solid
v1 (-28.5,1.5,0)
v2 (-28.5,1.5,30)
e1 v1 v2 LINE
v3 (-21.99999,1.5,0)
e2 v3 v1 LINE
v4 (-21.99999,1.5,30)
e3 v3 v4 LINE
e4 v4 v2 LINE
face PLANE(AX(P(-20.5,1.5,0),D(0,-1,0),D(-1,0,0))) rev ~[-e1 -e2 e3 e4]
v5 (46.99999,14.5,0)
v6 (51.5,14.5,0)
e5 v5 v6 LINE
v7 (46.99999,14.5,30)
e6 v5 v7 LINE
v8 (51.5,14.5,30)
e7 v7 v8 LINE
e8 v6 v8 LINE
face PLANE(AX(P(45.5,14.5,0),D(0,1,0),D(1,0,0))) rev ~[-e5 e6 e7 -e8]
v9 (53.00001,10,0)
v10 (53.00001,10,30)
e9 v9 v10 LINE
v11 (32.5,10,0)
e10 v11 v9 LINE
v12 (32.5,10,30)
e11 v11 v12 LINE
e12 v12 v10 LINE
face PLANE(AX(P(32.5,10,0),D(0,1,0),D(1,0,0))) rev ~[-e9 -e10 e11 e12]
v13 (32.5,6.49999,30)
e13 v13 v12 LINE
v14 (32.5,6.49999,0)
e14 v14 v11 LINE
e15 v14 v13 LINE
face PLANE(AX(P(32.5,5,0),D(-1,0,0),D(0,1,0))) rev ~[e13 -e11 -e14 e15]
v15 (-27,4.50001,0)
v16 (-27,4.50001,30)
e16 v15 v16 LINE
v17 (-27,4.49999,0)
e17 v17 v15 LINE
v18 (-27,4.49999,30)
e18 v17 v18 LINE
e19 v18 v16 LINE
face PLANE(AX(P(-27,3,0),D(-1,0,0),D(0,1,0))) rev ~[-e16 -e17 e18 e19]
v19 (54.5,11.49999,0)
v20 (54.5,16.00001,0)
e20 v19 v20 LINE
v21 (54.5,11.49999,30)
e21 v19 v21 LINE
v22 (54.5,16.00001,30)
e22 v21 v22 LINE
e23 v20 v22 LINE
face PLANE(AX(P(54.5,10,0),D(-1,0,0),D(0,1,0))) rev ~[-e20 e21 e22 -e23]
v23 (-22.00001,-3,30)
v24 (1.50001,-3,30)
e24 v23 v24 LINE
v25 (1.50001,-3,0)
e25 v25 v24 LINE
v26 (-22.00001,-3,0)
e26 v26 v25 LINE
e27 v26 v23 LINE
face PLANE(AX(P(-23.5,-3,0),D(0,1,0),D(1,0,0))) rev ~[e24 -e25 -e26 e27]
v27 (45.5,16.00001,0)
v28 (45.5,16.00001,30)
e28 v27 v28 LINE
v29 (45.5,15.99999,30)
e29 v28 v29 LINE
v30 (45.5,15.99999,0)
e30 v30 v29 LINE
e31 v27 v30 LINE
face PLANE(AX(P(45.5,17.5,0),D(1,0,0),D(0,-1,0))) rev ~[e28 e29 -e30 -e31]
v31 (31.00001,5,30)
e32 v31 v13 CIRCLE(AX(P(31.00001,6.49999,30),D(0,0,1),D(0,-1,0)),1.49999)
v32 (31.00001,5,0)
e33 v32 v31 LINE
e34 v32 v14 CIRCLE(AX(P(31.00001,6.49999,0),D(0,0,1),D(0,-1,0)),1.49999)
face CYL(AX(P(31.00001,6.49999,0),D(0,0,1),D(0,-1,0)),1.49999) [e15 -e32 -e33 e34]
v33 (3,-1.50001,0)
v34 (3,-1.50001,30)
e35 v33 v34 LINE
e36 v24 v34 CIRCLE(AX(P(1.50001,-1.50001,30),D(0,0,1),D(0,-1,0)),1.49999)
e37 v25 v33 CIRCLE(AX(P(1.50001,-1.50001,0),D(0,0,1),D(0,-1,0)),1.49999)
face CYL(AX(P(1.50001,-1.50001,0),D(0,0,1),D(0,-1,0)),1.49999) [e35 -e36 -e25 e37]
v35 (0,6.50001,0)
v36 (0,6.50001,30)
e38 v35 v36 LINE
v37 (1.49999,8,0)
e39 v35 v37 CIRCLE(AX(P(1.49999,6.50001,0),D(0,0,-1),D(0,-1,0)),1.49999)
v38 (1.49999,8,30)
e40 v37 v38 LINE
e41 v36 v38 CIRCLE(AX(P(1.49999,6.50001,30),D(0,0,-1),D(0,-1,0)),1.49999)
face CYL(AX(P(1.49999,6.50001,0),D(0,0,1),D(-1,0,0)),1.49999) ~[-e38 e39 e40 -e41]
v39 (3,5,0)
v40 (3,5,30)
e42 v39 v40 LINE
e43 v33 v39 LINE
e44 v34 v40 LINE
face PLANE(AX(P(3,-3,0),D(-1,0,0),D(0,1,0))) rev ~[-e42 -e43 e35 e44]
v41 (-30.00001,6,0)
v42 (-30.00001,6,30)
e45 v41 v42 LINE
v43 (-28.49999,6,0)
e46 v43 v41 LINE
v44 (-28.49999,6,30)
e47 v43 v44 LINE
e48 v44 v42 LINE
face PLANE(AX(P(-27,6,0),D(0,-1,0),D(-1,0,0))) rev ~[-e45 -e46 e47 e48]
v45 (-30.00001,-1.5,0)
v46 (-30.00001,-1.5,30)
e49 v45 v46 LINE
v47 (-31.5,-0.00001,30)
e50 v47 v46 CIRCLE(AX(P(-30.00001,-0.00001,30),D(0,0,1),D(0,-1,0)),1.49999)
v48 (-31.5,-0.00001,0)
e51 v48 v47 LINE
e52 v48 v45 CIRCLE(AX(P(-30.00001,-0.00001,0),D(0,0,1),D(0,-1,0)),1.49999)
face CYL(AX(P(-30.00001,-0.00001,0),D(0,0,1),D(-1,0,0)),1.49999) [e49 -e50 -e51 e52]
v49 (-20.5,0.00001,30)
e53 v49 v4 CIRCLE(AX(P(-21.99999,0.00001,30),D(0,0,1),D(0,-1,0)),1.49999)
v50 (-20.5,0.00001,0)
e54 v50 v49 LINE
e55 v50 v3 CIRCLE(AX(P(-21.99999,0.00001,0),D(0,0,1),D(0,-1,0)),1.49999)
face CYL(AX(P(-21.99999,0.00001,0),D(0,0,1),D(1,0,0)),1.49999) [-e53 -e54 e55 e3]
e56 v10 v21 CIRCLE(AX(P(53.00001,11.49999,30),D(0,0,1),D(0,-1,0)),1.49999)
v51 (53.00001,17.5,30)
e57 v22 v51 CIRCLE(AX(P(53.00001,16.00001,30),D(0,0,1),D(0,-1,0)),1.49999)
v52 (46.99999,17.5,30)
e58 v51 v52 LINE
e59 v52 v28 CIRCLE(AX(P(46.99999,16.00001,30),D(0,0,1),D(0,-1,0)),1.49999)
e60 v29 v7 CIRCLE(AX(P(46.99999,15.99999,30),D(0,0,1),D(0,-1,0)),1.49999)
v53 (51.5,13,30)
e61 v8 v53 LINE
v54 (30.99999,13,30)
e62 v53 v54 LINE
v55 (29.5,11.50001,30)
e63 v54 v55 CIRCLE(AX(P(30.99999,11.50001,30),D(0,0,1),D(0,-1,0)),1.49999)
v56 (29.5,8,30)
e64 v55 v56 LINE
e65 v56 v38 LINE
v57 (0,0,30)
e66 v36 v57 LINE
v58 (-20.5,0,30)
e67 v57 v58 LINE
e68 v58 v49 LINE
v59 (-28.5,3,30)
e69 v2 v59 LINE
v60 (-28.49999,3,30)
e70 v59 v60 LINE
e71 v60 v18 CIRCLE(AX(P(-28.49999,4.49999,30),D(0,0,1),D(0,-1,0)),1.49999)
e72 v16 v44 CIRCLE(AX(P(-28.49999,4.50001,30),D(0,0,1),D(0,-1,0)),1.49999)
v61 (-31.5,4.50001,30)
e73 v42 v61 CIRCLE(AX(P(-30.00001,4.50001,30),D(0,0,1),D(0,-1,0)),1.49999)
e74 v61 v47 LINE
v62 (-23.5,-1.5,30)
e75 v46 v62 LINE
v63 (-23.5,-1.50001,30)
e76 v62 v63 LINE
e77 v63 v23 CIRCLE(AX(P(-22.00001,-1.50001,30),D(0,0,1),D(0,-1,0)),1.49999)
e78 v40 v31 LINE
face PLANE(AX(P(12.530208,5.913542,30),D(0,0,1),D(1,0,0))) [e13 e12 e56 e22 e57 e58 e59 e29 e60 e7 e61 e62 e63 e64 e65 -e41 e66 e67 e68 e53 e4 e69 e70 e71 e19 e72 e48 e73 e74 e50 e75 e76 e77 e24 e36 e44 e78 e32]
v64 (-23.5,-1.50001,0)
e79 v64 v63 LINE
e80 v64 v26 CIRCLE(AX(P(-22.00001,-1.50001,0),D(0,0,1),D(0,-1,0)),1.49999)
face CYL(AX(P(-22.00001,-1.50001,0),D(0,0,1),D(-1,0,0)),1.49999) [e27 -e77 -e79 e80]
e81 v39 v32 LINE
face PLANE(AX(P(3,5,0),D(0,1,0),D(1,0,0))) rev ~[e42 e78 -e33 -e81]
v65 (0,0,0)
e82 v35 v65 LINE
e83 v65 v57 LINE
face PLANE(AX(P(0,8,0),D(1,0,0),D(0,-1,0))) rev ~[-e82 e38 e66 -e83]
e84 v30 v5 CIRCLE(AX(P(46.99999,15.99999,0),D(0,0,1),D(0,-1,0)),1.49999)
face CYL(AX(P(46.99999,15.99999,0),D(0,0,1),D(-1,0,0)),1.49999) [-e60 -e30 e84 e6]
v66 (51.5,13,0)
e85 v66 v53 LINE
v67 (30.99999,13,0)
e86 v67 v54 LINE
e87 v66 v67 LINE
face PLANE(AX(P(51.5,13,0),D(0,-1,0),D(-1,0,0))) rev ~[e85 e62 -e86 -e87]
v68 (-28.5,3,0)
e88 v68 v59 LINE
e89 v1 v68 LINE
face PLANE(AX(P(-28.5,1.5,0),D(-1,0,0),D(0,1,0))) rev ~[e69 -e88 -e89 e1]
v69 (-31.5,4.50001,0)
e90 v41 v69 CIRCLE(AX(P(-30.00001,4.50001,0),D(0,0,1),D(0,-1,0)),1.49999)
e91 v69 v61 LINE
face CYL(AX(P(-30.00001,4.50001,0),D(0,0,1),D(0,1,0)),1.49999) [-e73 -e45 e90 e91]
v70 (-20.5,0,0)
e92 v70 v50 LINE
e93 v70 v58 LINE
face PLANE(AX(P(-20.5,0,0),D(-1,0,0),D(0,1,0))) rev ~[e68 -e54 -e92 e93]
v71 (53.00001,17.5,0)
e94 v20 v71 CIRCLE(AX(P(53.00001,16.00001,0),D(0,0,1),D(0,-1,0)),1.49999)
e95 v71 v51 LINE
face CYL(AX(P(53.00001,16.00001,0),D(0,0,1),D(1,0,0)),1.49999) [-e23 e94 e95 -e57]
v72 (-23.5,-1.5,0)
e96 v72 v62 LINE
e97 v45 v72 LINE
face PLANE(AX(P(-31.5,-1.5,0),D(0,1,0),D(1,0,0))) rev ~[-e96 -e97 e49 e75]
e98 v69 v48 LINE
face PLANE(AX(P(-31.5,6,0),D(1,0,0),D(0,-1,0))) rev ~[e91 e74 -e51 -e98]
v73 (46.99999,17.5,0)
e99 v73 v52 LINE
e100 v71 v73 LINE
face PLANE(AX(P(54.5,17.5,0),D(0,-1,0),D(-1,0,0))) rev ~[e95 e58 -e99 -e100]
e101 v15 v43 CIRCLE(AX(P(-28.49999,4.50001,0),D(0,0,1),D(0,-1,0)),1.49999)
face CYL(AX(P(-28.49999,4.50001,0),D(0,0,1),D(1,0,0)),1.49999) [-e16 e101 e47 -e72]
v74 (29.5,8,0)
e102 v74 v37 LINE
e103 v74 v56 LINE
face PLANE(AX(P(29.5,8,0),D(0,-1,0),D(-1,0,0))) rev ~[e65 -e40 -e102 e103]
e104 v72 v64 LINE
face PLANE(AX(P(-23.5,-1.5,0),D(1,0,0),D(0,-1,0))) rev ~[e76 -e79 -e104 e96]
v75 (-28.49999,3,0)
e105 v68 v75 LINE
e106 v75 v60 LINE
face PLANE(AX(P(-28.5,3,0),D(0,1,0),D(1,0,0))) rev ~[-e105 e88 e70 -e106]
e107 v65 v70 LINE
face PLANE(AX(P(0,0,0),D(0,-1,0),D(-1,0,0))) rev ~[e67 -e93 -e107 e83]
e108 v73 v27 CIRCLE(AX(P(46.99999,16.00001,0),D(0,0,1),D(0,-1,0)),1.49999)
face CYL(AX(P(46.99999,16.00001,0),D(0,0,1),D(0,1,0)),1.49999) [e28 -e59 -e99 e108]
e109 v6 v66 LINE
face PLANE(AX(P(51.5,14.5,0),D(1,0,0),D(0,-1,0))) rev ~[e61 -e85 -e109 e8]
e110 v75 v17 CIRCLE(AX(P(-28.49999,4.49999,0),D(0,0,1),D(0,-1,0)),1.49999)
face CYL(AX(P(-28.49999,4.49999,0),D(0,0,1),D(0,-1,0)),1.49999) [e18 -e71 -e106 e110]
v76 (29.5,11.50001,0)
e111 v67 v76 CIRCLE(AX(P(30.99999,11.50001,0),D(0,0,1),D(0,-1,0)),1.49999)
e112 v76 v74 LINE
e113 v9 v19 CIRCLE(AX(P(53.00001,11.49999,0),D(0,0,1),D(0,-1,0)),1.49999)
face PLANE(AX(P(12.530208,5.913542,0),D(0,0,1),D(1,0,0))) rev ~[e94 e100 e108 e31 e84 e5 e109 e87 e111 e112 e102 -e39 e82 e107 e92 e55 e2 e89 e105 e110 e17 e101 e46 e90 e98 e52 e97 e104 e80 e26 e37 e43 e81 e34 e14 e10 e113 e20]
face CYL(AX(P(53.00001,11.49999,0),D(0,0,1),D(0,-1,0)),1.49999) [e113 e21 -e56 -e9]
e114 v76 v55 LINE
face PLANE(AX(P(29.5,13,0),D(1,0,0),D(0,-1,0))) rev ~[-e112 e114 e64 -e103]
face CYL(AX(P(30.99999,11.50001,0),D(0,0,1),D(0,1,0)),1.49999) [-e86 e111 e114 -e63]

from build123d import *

# Parameters (mm, degrees)
F1_DEPTH = 30
F2_R     = 1.49999


# Not quite as in the source:
# - a fillet or chamfer is up to 0.001 mm smaller than in the source, because OpenCascade refuses the exact size


with BuildPart() as f1:
    # F0 (on Top) → F1 (new body)
    with BuildSketch(Plane.XY):
        Polygon((0, 8), (0, 0), (-20.5, 0), (-20.5, 1.5), (-28.5, 1.5), (-28.5, 3), (-27, 3), (-27, 6), (-31.5, 6), (-31.5, -1.5), (-23.5, -1.5), (-23.5, -3), (3, -3), (3, 5), (32.5, 5), (32.5, 10), (54.5, 10), (54.5, 17.5), (45.5, 17.5), (45.5, 14.5), (51.5, 14.5), (51.5, 13), (29.5, 13), (29.5, 8), align=None)
    extrude(amount=F1_DEPTH)

    # F2 (radius 1.5 in the source; OpenCascade refuses exactly that, so slightly less here)
    f2_edges = [f1.edges().sort_by_distance(p)[0] for p in [
        (-23.5, -3, 15),
        (-31.5, -1.5, 15),
        (-20.5, 1.5, 15),
        (-27, 6, 15),
        (-27, 3, 15),
        (-31.5, 6, 15),
        (3, -3, 15),
        (0, 8, 15),
        (32.5, 5, 15),
        (29.5, 13, 15),
        (45.5, 17.5, 15),
        (45.5, 14.5, 15),
        (54.5, 10, 15),
        (54.5, 17.5, 15),
    ]]
    fillet(f2_edges, radius=F2_R)


solid = f1.part
